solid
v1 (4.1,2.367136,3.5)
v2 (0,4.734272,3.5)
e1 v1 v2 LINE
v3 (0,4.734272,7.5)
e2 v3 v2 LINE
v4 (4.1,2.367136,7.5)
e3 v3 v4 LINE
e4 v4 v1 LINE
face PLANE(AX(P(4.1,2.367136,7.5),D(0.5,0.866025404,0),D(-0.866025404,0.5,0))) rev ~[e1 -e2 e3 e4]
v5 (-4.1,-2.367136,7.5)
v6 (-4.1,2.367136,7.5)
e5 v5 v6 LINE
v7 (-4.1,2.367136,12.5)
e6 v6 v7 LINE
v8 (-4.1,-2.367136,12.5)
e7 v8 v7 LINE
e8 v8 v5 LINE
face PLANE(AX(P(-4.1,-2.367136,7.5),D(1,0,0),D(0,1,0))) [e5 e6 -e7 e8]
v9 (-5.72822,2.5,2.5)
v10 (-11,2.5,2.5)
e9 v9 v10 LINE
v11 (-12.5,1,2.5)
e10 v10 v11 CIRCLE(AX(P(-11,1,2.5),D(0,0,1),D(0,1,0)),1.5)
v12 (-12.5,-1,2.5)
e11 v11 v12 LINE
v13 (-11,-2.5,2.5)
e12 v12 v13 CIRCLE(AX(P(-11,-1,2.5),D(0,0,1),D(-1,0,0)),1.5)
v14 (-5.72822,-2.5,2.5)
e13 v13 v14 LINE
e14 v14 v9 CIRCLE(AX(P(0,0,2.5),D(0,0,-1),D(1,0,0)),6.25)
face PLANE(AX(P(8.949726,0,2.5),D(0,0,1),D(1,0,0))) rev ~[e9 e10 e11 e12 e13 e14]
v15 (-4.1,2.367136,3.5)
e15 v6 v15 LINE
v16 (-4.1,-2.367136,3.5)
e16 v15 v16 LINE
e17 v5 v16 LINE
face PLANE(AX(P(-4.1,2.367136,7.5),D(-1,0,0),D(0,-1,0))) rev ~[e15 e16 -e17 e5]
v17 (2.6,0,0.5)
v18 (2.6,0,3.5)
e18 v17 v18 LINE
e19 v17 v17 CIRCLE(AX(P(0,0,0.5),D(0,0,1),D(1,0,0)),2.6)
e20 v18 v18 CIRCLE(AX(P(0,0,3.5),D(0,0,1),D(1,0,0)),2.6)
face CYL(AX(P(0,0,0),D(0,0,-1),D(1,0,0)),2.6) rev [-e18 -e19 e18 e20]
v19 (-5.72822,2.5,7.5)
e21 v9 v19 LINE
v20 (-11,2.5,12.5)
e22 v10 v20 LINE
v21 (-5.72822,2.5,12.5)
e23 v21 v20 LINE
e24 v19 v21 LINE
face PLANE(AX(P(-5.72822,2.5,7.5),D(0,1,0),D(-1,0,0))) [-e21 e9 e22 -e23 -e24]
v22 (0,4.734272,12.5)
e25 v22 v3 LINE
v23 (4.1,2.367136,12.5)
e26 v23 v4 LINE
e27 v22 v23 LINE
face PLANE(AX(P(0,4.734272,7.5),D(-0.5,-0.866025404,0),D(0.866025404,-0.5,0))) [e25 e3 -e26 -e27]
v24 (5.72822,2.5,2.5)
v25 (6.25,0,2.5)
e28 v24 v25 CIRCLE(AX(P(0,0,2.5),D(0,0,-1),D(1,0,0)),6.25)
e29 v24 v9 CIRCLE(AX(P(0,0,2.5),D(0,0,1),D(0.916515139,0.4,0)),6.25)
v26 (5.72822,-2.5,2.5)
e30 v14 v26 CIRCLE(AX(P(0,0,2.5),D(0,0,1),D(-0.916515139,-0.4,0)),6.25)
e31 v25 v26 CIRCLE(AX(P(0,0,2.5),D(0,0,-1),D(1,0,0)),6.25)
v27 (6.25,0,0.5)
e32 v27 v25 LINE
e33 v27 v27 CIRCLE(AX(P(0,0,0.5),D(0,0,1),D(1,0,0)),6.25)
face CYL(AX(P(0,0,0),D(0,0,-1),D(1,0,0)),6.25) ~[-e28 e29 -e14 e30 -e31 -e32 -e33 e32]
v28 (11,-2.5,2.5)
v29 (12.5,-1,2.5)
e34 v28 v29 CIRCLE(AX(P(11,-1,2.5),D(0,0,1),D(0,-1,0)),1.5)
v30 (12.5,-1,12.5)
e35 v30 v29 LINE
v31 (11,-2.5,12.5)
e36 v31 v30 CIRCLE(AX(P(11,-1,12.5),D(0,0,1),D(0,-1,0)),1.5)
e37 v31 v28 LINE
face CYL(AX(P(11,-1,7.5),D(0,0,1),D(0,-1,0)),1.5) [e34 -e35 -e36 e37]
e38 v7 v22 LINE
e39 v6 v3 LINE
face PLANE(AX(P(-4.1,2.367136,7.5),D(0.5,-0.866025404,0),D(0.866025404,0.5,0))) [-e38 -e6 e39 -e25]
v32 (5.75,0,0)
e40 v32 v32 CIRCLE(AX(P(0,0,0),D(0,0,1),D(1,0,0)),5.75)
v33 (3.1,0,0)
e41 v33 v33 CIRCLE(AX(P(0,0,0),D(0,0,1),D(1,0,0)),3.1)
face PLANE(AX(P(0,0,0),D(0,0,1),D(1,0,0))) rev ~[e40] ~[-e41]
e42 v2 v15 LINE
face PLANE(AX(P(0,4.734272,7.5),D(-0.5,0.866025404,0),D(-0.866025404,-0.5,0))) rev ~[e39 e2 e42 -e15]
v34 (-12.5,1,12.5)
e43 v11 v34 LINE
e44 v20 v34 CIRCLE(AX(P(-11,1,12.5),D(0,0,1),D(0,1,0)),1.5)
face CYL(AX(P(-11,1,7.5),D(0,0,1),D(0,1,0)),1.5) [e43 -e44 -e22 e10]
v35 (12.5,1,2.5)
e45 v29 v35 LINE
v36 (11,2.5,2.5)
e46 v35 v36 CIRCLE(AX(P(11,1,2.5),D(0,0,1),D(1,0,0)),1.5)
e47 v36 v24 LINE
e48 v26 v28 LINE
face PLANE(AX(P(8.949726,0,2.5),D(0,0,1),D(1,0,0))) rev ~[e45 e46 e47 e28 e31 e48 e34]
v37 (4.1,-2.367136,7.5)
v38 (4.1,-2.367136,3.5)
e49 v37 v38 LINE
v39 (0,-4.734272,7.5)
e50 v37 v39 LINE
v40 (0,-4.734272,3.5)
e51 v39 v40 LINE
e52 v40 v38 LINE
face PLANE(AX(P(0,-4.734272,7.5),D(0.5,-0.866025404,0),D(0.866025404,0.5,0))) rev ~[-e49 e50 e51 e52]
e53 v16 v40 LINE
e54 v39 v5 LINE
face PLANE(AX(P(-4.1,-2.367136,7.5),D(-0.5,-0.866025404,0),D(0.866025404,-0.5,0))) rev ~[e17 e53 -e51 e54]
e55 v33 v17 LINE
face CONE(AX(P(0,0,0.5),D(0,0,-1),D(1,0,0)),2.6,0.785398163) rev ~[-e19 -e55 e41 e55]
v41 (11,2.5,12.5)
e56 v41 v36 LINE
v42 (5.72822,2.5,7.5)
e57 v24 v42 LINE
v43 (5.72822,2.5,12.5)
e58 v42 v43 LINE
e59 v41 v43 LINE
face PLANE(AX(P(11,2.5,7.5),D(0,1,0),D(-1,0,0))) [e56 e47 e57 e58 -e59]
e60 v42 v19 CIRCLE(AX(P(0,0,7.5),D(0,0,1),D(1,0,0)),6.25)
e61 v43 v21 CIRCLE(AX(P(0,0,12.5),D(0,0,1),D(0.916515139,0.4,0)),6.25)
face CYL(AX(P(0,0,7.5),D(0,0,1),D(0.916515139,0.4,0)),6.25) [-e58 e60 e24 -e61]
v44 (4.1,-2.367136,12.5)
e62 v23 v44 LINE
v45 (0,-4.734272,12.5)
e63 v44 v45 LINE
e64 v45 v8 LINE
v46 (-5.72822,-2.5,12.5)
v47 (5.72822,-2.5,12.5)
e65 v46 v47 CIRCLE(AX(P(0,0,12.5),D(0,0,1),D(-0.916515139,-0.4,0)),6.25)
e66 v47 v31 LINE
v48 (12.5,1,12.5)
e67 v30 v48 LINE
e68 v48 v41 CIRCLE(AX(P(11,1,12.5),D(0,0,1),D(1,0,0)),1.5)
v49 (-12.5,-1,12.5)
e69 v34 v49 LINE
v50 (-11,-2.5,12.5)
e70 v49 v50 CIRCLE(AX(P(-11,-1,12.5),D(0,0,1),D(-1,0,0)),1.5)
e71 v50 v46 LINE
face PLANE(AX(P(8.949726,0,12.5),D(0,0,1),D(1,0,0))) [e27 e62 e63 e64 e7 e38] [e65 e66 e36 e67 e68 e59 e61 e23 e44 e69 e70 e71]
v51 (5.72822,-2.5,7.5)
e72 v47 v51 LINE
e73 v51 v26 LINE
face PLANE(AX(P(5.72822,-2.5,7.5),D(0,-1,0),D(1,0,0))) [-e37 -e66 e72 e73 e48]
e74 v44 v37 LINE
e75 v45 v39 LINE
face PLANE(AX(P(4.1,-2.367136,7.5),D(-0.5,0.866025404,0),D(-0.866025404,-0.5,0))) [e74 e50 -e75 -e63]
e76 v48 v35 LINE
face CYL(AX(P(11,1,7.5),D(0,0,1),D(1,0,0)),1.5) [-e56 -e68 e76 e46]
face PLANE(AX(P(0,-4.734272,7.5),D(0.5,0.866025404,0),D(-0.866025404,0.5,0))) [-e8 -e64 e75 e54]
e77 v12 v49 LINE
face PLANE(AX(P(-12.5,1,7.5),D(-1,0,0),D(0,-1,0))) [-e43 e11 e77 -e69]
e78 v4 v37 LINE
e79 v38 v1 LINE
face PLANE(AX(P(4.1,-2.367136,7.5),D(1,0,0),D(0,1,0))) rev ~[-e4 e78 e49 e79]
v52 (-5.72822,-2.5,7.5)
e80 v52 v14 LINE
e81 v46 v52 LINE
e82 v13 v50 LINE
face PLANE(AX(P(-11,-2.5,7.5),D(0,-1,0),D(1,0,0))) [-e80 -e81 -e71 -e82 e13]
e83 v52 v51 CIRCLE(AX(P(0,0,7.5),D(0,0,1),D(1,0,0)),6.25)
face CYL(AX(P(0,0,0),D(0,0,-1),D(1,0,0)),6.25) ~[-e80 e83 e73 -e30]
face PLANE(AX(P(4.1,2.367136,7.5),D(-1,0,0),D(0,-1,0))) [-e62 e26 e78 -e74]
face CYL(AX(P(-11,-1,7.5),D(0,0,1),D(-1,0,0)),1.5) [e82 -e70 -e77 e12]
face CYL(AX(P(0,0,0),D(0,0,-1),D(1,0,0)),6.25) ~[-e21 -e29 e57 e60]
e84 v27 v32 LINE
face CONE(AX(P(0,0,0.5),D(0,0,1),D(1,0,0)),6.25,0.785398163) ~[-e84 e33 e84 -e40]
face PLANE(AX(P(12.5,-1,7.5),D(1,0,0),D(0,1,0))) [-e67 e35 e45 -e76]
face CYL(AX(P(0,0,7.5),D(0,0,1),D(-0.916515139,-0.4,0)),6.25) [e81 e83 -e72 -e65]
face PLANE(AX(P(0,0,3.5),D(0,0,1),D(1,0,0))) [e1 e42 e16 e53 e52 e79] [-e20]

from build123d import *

# Parameters (mm, degrees)
F0_R     = 6.25
F0_R_2   = 2.6
F1_DEPTH = 7.5
F3_DEPTH = 5
F4_SIZE  = 0.5
F5_R     = 2.6
F6_DEPTH = 4


# Not quite as in the source:
# - a feature names something its author has since deleted; it is built from what else it names


with BuildPart() as f1:
    # F0 (on Top) → F1 (new body)
    with BuildSketch(Plane.XY):
        Circle(F0_R)
        Circle(F0_R_2, mode=Mode.SUBTRACT)
    extrude(amount=F1_DEPTH)

    # F2 (on face) → F3 (join, symmetric)
    with BuildSketch(Plane.XY.offset(7.5)):
        with BuildLine():
            Line((11, 2.5), (5.7282196187, 2.5))
            ThreePointArc((5.7282196187, 2.5), (6.1181644558, 1.2769352731), (6.25, 0))
            ThreePointArc((6.25, 0), (6.1181644558, -1.2769352731), (5.7282196187, -2.5))
            Line((5.7282196187, -2.5), (11, -2.5))
            ThreePointArc((11, -2.5), (12.0606601718, -2.0606601718), (12.5, -1))
            Line((12.5, -1), (12.5, 1))
            ThreePointArc((12.5, 1), (12.0606601718, 2.0606601718), (11, 2.5))
        make_face()
        with BuildLine():
            ThreePointArc((-5.7282196187, -2.5), (-6.25, 0), (-5.7282196187, 2.5))
            Line((-5.7282196187, 2.5), (-11, 2.5))
            ThreePointArc((-11, 2.5), (-12.0606601718, 2.0606601718), (-12.5, 1))
            Line((-12.5, 1), (-12.5, -1))
            ThreePointArc((-12.5, -1), (-12.0606601718, -2.0606601718), (-11, -2.5))
            Line((-11, -2.5), (-5.7282196187, -2.5))
        make_face()
        with BuildLine():
            ThreePointArc((6.25, 0), (6.1181644558, 1.2769352731), (5.7282196187, 2.5))
            ThreePointArc((5.7282196187, 2.5), (0, 6.25), (-5.7282196187, 2.5))
            ThreePointArc((-5.7282196187, 2.5), (-6.25, 0), (-5.7282196187, -2.5))
            ThreePointArc((-5.7282196187, -2.5), (0, -6.25), (5.7282196187, -2.5))
            ThreePointArc((5.7282196187, -2.5), (6.1181644558, -1.2769352731), (6.25, 0))
        make_face()
        Polygon((-4.1, 2.3671361037), (0, 4.7342722074), (4.1, 2.3671361037), (4.1, -2.3671361037), (0, -4.7342722074), (-4.1, -2.3671361037), align=None, mode=Mode.SUBTRACT)
    extrude(amount=F3_DEPTH, both=True)

    # F4
    f4_edges = [f1.edges().sort_by_distance(p)[0] for p in [
        (-6.25, 0, 0),
        (-2.6, 0, 0),
    ]]
    chamfer(f4_edges, length=F4_SIZE)

    # F5 (on face) → F6 (cut)
    with BuildSketch(Plane.XY.offset(7.5)):
        Polygon((4.1, -2.3671361037), (4.1, 2.3671361037), (0, 4.7342722074), (-4.1, 2.3671361037), (-4.1, -2.3671361037), (0, -4.7342722074), align=None)
        Circle(F5_R, mode=Mode.SUBTRACT)
    extrude(amount=-F6_DEPTH, mode=Mode.SUBTRACT)


solid = f1.part
